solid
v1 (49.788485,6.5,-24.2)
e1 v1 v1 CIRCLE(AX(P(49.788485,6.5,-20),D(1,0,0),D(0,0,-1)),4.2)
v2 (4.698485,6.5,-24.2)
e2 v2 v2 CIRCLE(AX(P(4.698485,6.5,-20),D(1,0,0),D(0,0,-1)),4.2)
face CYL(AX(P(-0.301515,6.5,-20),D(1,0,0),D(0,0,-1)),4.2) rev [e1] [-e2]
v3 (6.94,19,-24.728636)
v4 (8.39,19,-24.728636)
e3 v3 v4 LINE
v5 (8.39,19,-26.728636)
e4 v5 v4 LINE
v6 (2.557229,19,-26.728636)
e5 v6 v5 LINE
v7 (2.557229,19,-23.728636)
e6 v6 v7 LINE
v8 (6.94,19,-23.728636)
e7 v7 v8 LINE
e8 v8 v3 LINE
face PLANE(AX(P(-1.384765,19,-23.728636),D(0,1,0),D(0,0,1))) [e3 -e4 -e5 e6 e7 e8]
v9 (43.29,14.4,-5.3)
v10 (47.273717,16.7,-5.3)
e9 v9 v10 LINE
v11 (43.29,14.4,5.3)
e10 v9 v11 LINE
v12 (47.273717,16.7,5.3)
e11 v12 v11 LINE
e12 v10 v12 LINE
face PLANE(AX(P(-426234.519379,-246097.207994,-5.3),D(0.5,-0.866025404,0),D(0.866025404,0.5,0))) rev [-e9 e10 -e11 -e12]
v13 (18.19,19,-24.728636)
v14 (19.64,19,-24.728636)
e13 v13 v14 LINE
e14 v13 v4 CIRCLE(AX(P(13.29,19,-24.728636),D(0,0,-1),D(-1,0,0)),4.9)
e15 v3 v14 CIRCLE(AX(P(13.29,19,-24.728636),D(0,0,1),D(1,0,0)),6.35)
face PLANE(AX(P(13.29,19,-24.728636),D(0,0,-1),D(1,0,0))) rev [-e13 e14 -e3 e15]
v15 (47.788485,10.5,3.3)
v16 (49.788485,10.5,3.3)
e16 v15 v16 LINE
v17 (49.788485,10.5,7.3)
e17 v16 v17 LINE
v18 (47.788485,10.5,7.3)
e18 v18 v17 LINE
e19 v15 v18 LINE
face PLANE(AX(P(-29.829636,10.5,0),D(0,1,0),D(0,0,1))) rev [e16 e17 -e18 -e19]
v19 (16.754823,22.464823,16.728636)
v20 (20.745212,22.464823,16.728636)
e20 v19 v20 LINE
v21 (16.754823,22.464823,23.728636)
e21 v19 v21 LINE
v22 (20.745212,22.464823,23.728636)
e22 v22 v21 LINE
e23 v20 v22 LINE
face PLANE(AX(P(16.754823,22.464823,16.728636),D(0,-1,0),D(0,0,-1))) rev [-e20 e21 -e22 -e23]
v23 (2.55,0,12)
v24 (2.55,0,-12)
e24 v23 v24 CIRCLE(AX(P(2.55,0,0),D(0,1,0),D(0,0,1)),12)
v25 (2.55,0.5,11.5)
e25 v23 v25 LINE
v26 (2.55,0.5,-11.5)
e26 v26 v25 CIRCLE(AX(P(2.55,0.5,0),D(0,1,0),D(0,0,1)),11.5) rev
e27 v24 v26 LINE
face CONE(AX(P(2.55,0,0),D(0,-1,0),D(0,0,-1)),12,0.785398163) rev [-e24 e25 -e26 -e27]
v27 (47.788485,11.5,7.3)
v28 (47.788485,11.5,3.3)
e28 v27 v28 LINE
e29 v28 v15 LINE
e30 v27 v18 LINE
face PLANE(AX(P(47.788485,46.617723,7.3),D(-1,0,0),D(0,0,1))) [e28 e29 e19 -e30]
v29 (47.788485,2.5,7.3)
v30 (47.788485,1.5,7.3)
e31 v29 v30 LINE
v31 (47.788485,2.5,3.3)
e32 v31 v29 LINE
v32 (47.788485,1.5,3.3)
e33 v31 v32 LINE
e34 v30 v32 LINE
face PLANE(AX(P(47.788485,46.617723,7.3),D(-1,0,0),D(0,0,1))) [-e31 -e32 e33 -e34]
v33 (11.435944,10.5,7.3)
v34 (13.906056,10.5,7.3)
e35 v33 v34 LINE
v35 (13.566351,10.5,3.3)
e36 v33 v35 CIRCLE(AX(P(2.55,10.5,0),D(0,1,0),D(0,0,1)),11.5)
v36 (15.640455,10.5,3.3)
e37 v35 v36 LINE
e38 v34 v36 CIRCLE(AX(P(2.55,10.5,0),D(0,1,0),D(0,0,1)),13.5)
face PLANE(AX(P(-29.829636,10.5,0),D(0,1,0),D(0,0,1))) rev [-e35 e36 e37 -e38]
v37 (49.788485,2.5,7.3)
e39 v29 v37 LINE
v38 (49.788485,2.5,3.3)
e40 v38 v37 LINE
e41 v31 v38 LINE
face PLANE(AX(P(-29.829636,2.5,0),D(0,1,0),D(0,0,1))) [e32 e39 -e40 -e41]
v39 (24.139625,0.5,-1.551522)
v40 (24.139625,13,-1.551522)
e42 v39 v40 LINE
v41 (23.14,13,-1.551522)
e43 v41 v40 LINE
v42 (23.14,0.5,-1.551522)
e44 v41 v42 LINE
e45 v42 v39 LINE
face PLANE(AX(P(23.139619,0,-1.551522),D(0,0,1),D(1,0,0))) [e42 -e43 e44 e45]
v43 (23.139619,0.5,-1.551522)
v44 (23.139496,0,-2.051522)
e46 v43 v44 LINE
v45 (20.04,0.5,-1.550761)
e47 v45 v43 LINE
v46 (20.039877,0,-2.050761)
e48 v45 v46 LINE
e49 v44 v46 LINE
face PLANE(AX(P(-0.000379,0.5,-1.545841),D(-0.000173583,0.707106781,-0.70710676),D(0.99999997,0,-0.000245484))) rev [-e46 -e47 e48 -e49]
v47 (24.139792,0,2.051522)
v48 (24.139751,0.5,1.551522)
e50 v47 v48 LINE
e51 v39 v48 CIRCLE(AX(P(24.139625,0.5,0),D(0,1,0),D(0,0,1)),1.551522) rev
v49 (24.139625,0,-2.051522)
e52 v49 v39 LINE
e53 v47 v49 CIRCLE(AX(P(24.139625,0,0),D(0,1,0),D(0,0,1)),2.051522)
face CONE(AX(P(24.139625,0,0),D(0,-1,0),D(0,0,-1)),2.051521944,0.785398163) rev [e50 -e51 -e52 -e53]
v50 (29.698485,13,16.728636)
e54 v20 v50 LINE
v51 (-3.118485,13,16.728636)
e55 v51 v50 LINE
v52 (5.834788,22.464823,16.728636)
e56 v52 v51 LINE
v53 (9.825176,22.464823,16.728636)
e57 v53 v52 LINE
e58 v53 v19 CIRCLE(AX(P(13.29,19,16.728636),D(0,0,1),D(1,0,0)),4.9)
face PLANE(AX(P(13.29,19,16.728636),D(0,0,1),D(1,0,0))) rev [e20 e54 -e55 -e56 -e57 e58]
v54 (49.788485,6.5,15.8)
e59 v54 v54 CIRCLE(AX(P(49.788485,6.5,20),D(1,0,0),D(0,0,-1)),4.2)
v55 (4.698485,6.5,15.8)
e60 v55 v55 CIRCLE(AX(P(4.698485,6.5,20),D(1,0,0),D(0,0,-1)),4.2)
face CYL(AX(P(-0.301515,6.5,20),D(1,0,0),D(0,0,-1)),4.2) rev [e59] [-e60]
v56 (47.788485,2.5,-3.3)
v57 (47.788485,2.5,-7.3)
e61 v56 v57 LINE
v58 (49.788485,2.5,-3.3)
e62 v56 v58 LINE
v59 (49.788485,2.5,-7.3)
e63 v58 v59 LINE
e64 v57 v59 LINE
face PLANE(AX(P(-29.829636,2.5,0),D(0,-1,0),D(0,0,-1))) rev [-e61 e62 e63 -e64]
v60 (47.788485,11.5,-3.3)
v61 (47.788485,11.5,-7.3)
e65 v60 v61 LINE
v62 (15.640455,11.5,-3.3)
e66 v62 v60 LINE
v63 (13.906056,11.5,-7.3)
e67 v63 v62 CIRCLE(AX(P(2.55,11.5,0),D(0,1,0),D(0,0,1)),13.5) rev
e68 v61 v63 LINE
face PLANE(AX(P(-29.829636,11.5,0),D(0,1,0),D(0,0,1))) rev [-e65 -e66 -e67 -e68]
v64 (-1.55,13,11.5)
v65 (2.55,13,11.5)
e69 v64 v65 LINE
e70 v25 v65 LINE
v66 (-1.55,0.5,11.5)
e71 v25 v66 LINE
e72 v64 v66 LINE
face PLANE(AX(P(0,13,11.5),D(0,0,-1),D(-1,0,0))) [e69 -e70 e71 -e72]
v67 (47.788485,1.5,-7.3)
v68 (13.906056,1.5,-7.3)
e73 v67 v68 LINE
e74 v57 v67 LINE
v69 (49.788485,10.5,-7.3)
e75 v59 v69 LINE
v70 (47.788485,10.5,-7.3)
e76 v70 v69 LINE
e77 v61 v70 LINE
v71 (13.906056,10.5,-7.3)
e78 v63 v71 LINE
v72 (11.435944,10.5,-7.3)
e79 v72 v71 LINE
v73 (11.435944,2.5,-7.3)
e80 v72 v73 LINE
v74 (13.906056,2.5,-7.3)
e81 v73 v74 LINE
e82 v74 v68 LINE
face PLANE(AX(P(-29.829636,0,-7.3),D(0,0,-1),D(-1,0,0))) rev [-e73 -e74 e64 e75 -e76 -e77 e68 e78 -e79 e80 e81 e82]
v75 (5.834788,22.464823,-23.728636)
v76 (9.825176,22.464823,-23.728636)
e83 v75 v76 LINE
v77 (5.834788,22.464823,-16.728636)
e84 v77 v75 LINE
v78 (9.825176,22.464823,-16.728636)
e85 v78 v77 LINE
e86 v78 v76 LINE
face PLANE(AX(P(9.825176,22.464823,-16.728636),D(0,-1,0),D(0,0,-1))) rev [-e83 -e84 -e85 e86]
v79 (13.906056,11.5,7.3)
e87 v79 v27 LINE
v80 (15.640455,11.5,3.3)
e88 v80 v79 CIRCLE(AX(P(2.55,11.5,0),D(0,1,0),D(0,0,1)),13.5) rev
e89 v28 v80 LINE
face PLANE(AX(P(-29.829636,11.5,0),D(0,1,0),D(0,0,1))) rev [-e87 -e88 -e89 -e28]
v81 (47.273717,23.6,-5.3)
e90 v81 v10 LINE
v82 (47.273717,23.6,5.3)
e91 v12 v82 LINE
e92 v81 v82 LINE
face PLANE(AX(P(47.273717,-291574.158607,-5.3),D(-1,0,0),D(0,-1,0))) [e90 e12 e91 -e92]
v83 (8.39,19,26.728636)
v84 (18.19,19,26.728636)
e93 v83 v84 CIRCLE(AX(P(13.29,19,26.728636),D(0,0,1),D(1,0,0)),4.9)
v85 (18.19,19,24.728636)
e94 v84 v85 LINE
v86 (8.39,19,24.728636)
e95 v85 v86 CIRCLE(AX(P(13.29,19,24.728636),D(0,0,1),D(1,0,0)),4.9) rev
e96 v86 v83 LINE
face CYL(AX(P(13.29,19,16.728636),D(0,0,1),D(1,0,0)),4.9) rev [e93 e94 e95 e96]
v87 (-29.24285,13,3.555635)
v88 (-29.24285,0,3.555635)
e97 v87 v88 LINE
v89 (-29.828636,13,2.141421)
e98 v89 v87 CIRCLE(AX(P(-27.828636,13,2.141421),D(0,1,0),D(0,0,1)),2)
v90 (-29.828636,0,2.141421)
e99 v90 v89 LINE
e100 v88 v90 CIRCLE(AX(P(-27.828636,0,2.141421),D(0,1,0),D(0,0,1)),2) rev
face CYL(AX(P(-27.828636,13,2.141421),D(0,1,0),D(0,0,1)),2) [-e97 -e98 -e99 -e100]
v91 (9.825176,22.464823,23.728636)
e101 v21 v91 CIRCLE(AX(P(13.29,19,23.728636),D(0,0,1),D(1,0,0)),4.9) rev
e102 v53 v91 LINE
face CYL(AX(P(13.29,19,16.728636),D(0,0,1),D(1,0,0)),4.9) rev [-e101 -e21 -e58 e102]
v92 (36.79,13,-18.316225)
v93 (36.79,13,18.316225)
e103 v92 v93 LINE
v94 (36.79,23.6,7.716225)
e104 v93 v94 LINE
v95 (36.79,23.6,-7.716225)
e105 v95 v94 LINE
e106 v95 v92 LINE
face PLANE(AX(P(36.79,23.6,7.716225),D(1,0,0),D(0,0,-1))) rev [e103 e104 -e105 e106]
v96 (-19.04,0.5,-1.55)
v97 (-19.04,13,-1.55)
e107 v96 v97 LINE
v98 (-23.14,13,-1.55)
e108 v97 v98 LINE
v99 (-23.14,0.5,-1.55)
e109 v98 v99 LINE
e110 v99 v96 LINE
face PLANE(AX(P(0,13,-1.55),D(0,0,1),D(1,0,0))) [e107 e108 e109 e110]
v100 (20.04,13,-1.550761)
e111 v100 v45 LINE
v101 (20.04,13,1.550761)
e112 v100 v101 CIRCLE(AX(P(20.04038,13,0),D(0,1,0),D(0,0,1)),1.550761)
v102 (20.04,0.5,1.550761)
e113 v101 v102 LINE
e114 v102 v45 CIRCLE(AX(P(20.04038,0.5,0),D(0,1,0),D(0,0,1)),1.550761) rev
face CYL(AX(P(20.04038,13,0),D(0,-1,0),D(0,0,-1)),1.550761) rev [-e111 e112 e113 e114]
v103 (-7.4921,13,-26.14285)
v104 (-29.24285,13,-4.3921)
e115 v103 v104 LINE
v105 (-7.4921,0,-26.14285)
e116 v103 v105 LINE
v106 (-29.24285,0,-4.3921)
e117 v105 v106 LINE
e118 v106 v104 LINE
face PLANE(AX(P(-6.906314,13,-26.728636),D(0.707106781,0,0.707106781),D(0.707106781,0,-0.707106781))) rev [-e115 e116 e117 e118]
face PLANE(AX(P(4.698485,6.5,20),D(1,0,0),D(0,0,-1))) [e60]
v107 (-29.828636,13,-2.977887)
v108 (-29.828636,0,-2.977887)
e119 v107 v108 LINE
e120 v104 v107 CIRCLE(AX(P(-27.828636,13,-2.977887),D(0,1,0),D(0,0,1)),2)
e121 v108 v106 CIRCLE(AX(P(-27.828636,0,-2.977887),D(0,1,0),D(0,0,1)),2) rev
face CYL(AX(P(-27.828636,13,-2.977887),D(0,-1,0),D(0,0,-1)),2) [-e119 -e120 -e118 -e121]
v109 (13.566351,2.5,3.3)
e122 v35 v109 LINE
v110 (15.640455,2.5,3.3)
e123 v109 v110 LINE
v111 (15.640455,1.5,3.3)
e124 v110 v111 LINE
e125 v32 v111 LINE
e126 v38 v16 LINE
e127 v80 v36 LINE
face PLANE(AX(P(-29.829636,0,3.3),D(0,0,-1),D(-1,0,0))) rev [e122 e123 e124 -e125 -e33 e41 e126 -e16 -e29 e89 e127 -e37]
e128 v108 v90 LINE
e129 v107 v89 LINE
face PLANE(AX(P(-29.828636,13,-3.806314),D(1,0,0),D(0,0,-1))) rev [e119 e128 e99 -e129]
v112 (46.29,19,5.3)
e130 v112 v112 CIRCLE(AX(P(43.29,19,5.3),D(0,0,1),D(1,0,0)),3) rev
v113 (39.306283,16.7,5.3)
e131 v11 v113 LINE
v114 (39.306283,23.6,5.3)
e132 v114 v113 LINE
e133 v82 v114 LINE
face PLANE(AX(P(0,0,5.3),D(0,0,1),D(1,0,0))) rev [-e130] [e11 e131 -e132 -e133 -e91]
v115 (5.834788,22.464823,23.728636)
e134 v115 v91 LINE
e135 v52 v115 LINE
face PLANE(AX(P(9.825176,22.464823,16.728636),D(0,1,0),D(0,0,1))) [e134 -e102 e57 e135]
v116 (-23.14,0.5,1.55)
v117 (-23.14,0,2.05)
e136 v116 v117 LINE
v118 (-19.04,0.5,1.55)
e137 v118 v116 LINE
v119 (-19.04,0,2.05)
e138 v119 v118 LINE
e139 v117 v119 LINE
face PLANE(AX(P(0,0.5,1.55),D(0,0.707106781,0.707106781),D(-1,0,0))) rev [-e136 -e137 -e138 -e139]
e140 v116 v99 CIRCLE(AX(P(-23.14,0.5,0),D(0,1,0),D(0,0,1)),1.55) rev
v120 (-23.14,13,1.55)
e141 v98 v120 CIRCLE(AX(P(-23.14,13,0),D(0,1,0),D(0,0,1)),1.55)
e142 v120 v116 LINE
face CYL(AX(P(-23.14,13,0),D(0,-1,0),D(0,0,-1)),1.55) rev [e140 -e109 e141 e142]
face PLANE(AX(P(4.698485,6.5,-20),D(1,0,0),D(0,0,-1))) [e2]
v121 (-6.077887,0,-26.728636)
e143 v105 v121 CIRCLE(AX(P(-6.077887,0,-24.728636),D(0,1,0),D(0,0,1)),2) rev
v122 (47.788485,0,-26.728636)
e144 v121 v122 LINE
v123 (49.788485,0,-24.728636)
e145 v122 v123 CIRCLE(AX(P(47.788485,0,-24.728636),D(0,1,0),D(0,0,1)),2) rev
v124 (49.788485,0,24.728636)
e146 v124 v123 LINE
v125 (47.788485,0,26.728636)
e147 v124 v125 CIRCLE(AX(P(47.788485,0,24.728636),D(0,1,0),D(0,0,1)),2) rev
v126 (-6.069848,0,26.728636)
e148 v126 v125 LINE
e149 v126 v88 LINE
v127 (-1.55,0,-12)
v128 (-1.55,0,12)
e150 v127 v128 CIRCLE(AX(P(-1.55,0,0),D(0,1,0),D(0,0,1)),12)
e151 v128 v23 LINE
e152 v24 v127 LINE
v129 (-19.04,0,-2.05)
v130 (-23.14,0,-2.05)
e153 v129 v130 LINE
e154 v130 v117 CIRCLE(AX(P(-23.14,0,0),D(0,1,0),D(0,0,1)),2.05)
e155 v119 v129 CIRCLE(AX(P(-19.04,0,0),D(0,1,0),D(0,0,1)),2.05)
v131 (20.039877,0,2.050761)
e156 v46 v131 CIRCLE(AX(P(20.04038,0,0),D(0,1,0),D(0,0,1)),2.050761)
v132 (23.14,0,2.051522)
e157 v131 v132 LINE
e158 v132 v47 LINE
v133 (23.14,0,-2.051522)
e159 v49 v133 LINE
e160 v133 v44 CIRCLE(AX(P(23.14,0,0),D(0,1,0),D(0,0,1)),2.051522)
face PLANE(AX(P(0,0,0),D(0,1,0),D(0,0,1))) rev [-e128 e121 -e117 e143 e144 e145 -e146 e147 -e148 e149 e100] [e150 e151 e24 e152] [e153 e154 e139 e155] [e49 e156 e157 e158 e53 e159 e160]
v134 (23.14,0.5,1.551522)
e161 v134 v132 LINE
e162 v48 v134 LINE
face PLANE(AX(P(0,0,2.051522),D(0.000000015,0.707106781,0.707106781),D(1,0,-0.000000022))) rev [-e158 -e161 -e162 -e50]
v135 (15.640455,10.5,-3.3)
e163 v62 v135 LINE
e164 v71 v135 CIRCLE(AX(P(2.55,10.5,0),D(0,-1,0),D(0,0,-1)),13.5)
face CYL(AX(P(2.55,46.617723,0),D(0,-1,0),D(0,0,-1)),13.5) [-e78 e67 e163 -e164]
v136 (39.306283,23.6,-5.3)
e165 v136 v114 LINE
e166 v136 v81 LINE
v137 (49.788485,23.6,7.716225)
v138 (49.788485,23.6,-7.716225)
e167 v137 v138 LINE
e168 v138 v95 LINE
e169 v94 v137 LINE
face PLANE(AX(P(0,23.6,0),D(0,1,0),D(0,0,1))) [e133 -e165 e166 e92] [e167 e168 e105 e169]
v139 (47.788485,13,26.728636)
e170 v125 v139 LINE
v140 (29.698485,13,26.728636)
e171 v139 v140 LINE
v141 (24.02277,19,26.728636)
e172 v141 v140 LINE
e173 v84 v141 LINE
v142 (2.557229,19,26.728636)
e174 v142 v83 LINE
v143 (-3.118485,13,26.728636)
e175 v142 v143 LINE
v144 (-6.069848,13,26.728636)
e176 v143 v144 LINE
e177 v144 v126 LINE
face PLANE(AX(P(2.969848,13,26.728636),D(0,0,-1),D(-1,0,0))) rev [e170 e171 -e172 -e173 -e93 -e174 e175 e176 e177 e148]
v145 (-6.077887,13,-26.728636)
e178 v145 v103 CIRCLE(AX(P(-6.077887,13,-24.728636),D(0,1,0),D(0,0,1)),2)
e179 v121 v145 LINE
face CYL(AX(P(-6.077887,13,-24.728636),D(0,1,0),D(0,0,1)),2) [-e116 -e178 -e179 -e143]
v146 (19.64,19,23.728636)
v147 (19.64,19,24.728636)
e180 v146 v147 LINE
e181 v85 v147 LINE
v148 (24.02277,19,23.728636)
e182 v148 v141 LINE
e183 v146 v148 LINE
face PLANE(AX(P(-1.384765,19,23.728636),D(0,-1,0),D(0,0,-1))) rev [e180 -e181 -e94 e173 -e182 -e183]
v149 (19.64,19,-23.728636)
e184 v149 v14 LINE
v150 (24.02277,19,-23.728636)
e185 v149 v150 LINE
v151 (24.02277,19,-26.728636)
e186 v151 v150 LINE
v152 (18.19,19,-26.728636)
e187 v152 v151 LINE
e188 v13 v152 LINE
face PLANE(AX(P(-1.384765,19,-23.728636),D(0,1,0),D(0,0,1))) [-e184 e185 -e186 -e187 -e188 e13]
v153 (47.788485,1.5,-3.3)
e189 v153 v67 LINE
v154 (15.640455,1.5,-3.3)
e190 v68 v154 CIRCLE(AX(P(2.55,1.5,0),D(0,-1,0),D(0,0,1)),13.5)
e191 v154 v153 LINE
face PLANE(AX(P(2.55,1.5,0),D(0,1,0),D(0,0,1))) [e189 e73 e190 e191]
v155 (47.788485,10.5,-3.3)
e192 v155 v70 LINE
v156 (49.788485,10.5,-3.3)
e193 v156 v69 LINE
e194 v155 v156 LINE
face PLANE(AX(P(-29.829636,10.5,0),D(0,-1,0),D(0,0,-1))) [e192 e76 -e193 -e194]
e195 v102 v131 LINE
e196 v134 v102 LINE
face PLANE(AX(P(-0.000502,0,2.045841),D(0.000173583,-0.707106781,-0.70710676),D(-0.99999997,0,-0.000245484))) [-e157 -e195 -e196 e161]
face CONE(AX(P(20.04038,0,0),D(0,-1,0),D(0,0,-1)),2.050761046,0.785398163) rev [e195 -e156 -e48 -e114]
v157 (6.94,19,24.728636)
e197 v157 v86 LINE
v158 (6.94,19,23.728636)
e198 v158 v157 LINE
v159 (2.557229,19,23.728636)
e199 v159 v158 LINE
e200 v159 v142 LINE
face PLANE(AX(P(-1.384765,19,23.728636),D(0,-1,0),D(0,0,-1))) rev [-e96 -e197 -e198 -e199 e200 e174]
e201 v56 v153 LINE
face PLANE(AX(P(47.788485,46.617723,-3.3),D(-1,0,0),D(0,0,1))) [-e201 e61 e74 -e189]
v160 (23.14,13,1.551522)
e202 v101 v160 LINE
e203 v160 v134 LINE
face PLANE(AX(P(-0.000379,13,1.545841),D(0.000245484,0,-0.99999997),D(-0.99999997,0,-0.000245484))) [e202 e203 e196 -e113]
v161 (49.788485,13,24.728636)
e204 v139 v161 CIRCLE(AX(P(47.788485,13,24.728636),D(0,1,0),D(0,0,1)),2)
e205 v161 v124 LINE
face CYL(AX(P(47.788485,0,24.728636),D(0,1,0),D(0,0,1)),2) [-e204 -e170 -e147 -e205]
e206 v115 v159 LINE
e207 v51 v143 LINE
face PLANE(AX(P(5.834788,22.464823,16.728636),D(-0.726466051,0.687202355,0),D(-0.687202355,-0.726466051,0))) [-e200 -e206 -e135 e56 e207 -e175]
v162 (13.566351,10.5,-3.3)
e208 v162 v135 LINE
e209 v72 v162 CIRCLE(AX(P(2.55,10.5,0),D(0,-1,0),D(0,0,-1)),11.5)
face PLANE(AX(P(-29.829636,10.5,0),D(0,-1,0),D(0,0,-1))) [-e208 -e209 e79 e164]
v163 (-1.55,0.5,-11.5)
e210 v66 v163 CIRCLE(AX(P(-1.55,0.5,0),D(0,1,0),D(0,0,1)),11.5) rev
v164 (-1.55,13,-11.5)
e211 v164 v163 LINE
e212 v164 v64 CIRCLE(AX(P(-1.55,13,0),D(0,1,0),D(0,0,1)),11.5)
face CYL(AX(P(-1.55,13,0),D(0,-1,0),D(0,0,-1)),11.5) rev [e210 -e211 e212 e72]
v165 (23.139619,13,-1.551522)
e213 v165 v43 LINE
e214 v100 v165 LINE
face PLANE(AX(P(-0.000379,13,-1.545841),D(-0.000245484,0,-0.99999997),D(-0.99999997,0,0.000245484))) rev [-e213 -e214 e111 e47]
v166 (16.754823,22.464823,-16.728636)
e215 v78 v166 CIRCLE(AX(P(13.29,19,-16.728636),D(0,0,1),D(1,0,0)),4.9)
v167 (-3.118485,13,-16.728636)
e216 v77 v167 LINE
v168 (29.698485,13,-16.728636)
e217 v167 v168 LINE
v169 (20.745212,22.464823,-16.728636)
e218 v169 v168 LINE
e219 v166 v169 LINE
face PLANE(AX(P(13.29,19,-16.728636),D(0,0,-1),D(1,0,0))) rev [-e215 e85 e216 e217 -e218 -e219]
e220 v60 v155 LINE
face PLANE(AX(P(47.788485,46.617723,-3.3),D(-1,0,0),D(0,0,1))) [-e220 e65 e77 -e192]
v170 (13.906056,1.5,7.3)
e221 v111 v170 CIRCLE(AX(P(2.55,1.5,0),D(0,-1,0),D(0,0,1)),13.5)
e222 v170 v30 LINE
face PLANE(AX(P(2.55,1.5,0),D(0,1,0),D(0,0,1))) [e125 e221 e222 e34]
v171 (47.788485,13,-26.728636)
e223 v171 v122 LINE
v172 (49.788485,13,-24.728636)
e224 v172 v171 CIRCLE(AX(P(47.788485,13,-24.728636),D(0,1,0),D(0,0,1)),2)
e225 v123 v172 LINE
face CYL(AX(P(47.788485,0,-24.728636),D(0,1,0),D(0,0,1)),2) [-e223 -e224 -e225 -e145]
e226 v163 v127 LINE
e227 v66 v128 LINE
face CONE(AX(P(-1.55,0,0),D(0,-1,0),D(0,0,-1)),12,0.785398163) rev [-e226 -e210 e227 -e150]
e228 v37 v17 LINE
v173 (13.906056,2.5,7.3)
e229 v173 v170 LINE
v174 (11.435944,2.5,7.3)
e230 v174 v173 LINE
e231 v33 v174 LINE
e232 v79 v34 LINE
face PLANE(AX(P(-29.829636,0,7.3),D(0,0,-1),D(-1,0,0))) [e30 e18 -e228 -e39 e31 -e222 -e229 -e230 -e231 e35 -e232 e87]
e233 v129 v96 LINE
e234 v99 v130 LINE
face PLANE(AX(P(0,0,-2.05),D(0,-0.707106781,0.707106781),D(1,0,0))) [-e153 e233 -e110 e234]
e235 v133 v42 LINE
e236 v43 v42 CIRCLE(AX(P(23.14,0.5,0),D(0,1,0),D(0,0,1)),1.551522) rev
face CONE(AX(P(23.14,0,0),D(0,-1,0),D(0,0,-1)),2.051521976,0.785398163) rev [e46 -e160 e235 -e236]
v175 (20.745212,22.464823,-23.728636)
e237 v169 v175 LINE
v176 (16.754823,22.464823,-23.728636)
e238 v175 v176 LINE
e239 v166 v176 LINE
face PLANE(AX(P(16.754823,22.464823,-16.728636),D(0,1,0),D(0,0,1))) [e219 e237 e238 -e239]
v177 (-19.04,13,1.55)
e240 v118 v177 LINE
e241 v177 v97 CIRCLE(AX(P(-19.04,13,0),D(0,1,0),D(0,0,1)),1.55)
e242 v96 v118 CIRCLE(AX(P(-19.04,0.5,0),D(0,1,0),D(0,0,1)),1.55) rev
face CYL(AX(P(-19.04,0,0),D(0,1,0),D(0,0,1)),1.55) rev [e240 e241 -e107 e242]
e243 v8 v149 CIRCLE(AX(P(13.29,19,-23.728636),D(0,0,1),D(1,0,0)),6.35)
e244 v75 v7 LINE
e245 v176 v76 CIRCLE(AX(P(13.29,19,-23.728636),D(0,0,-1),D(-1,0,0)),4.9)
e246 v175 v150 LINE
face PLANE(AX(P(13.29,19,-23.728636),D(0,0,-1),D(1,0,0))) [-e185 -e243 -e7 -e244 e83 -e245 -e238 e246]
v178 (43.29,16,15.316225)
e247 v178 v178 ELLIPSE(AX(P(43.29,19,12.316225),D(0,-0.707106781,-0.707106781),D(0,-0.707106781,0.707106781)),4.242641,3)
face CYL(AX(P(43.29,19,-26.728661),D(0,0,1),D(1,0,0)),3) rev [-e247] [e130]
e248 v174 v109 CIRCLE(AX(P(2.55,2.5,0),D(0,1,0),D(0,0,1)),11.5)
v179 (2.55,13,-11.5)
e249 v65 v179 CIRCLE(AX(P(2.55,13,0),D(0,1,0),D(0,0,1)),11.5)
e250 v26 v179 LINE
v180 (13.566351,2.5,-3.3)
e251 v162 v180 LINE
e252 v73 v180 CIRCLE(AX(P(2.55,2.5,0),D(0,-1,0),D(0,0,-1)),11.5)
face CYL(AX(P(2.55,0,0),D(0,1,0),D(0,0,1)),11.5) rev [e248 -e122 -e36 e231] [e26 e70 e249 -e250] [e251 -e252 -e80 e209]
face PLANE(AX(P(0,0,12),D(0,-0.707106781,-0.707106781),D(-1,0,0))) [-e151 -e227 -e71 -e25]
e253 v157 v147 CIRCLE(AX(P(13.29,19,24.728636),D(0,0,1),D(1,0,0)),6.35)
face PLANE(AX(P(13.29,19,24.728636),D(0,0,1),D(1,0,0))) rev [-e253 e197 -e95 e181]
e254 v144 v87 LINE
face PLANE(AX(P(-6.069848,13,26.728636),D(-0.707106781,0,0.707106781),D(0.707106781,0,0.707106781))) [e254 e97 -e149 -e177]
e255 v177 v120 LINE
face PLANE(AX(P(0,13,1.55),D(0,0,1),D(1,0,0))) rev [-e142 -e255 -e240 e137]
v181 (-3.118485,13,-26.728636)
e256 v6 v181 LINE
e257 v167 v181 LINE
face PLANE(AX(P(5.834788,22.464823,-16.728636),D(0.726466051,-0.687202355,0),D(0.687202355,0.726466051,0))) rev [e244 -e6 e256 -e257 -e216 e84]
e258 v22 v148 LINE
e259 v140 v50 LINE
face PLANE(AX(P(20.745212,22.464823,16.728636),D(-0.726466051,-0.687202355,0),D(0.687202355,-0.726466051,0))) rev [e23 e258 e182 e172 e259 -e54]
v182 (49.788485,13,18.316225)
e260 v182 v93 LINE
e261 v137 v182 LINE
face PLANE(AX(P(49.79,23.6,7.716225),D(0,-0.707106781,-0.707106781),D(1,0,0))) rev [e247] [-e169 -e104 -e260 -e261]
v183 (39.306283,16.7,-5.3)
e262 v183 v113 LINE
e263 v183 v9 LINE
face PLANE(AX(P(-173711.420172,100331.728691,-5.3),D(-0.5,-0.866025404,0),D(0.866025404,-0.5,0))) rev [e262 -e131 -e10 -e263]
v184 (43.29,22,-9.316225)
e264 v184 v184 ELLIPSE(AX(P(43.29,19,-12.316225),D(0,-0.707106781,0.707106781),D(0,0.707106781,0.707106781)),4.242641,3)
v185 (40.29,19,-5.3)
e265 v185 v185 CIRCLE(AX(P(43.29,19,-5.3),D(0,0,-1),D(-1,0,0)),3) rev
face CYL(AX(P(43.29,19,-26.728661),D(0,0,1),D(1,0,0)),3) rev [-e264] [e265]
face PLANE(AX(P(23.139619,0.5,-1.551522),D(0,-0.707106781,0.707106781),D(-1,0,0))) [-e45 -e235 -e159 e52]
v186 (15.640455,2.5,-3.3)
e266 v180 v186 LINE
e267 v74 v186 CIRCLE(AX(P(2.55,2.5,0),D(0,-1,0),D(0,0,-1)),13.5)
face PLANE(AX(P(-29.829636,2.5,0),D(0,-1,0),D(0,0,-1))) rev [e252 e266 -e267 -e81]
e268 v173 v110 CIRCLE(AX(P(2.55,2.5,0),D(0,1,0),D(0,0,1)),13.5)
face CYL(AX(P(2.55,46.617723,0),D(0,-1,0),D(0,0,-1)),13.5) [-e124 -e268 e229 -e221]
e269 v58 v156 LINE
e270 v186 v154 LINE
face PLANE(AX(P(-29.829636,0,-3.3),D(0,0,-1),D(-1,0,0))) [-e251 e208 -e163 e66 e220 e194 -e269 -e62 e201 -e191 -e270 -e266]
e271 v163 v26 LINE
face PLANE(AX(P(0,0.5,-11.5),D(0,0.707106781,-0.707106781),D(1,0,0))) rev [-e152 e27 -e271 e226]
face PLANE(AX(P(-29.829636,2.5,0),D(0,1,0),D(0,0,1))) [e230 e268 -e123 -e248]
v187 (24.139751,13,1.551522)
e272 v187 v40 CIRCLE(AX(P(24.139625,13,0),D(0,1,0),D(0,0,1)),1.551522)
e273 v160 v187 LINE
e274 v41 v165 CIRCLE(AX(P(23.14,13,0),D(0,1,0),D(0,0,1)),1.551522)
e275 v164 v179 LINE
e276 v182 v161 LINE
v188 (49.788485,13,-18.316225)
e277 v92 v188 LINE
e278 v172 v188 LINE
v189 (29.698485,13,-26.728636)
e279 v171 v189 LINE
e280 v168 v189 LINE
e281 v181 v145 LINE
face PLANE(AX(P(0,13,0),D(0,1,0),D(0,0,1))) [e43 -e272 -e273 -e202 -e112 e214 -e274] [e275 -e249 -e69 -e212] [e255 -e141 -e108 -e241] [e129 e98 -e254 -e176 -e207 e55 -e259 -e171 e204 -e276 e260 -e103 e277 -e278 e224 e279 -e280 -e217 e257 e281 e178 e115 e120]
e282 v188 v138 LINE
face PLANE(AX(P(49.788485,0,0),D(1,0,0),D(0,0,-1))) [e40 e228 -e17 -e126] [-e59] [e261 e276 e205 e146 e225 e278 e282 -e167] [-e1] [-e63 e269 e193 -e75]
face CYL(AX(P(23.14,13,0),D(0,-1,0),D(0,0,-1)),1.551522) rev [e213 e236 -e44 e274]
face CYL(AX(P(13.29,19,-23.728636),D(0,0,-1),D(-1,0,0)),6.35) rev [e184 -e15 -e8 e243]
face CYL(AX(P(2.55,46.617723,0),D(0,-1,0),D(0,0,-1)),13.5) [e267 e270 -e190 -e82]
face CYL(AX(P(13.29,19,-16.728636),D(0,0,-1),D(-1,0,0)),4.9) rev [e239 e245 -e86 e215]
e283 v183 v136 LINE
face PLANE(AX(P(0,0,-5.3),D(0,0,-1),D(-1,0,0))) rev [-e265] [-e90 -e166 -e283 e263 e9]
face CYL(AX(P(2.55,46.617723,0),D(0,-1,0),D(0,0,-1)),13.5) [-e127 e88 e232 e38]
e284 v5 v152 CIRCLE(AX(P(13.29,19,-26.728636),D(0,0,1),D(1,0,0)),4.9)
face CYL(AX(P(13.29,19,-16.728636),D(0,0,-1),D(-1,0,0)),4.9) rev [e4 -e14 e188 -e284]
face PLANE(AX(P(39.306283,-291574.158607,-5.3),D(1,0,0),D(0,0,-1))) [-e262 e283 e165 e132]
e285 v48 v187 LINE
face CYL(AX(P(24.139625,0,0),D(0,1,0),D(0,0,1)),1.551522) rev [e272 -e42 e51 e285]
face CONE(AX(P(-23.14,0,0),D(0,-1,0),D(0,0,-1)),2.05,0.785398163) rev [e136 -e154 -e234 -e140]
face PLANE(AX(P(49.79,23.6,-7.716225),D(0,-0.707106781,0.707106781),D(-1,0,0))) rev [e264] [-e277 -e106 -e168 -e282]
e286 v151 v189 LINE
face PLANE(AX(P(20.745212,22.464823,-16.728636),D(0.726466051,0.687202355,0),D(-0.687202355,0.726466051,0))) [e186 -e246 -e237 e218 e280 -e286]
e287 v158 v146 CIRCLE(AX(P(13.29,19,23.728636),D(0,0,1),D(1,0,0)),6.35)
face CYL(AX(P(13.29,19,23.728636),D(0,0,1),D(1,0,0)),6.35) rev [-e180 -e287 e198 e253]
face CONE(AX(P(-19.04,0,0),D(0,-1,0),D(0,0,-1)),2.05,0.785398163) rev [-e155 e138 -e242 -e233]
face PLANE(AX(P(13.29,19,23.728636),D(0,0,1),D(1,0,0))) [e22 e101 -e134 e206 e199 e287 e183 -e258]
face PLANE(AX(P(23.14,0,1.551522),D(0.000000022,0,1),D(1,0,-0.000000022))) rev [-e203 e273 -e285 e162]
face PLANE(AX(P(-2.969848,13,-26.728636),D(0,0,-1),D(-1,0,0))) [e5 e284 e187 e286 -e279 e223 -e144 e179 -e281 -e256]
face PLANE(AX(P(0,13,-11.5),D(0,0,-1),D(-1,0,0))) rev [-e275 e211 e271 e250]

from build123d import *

# Parameters (mm, degrees)
BOSS_EXTRUDE2_DEPTH      = 13
CUT_EXTRUDE6_DEPTH       = 43.108996013
CUT_EXTRUDE7_DEPTH       = 43.108996013
CUT_EXTRUDE8_DEPTH       = 13
SKETCH7_R                = 4.2
CUT_EXTRUDE9_DEPTH       = 30
BOSS_EXTRUDE3_DEPTH      = 10
CUT_EXTRUDE10_DEPTH      = 1
SKETCH13_R               = 4.2
BOSS_EXTRUDE4_DEPTH      = 20.09
SKETCH17_W               = 13
SKETCH17_H               = 15.432451
BOSS_EXTRUDE5_DEPTH      = 10.6
CHAMFER1_SIZE            = 10.6
SKETCH12_R               = 3
CUT_EXTRUDE11_DEPTH      = 77.770333281
CUT_EXTRUDE12_START      = -6.148636
CUT_EXTRUDE12_DEPTH      = 5.3
FILLET2_R                = 2
SKETCH25_W               = 86.308607618
SKETCH25_H               = 69.103285455
CUT_EXTRUDE13_DEPTH      = 0.00151491
CUT_EXTRUDE14_DEPTH      = 58.985456967
CUT_EXTRUDE15_REACH      = 89.237
CUT_EXTRUDE15_END_RADIUS = 11.5
SKETCH27_W               = 4
SKETCH27_H               = 8
SKETCH28_W               = 26.149590075
SKETCH28_H               = 8.463351347
CUT_EXTRUDE16_DEPTH      = 3
FILLET9_R                = 2
SKETCH34_R               = 4.2
BOSS_EXTRUDE7_DEPTH      = 5
CUT_EXTRUDE22_START      = -13
CUT_EXTRUDE22_DEPTH      = 13
CUT_EXTRUDE23_DEPTH      = 58.985456967
CUT_EXTRUDE24_START      = -1
CUT_EXTRUDE24_DEPTH      = 10
CHAMFER2_SIZE            = 0.5


# Read off the part's stored shape, not the designer's step: Cut-Extrude22
with BuildPart() as part:
    # Sketch1 → Boss-Extrude2 (new body)
    with BuildSketch(Plane(origin=(0, 0, 0), x_dir=(1, 0, 0), z_dir=(0, 1, 0))):
        Polygon((-2.969848481, 26.728636329), (-6.906313813, 26.728636329), (-29.828636329, 3.806313813), (-29.828636329, -2.969848481), (-6.069848481, -26.728636329), (-2.969848481, -26.728636329), (2.969848481, -26.728636329), (29.69848481, -26.728636329), (29.69848481, 26.728636329), (2.969848481, 26.728636329), align=None)
    extrude(amount=BOSS_EXTRUDE2_DEPTH)

    # Sketch1<8> → Cut-Extrude6 (cut, through all)
    with BuildSketch(Plane(origin=(0, 0, 0), x_dir=(1, 0, 0), z_dir=(0, 1, 0))):
        with BuildLine():
            Line((-23.14, -1.55), (-20.04, -1.55))
            ThreePointArc((-20.04, -1.55), (-18.49, 0), (-20.04, 1.55))
            Line((-20.04, 1.55), (-23.14, 1.55))
            ThreePointArc((-23.14, 1.55), (-24.69, 0), (-23.14, -1.55))
        make_face()
    extrude(amount=CUT_EXTRUDE6_DEPTH, mode=Mode.SUBTRACT)

    # Sketch1<9> → Cut-Extrude7 (cut, through all)
    with BuildSketch(Plane(origin=(0, 0, 0), x_dir=(1, 0, 0), z_dir=(0, 1, 0))):
        with BuildLine():
            Line((9.28999972, -8.505433812), (9.28999972, 8.505433812))
            ThreePointArc((9.28999972, 8.505433812), (5.69954884, 10.725261974), (1.55, 11.5))
            Line((1.55, 11.5), (-1.55, 11.5))
            ThreePointArc((-1.55, 11.5), (-13.05, 0), (-1.55, -11.5))
            Line((-1.55, -11.5), (1.55, -11.5))
            ThreePointArc((1.55, -11.5), (5.69954884, -10.725261974), (9.28999972, -8.505433812))
        make_face()
        with BuildLine():
            ThreePointArc((9.28999972, -8.505433812), (13.05, 0), (9.28999972, 8.505433812))
            Line((9.28999972, 8.505433812), (9.28999972, -8.505433812))
        make_face()
    extrude(amount=CUT_EXTRUDE7_DEPTH, mode=Mode.SUBTRACT)

    # Sketch1<11> → Cut-Extrude8 (cut)
    with BuildSketch(Plane(origin=(0, 0, 0), x_dir=(1, 0, 0), z_dir=(0, 1, 0))):
        with BuildLine():
            Line((23.139619127, 1.551521906), (20.03999972, 1.550761))
            ThreePointArc((20.03999972, 1.550761), (18.48961936, 0), (20.03999972, -1.550761))
            Line((20.03999972, -1.550761), (23.14, -1.551521999))
            ThreePointArc((23.14, -1.551521999), (24.691521964, 0.000190413), (23.139619127, 1.551521906))
        make_face()
        with BuildLine():
            ThreePointArc((21.589619103, -0.059493857), (21.588478024, -1.2e-08), (21.589619104, 0.059493833))
            ThreePointArc((21.589619104, 0.059493833), (21.590760744, -1.2e-08), (21.589619103, -0.059493857))
        make_face(mode=Mode.SUBTRACT)
    extrude(amount=CUT_EXTRUDE8_DEPTH, mode=Mode.SUBTRACT)


with BuildPart() as cut_extrude8_piece_1:
    # of the separate pieces the step leaves, piece 1, a body of its own (cut_extrude8_pieces)
    add(part.part.solids().sort_by_distance((-6.906313813, 0, -26.728636329))[0])

    # Sketch7 → Cut-Extrude9 (cut)
    with BuildSketch(Plane(origin=(29.69848481, 0, 0), x_dir=(0, 0, -1), z_dir=(1, 0, 0))):
        with Locations((-20, 6.5)):
            Circle(SKETCH7_R)
        with Locations((20, 6.5)):
            Circle(SKETCH7_R)
    extrude(amount=-CUT_EXTRUDE9_DEPTH, mode=Mode.SUBTRACT)

    # Sketch9 → Boss-Extrude3 (add)
    with BuildSketch(Plane.XY.offset(26.728636329)):
        with BuildLine():
            Line((-3.11848537, 13), (29.69848481, 13))
            Line((29.69848481, 13), (20.745211893, 22.464823228))
            Line((20.745211893, 22.464823228), (16.754822948, 22.464823228))
            ThreePointArc((16.754822948, 22.464823228), (13.28999972, 14.1), (9.825176492, 22.464823228))
            Line((9.825176492, 22.464823228), (5.834787547, 22.464823228))
            Line((5.834787547, 22.464823228), (-3.11848537, 13))
        make_face()
    boss_extrude3 = extrude(amount=-BOSS_EXTRUDE3_DEPTH)

    # Sketch10 → Cut-Extrude10 (cut)
    with BuildSketch(Plane.XY.offset(24.728636329)):
        with BuildLine():
            Line((6.93999972, 19), (6.93999972, 29.430631577))
            Line((6.93999972, 29.430631577), (19.63999972, 29.430631577))
            Line((19.63999972, 29.430631577), (19.63999972, 19))
            ThreePointArc((19.63999972, 19), (13.28999972, 12.65), (6.93999972, 19))
        make_face()
    cut_extrude10 = extrude(amount=-CUT_EXTRUDE10_DEPTH, mode=Mode.SUBTRACT)

    # Mirror1: Boss-Extrude3, Cut-Extrude10 across plane
    add(boss_extrude3.mirror(Plane.XY))
    add(cut_extrude10.mirror(Plane.XY), mode=Mode.SUBTRACT)

    # Sketch13 → Boss-Extrude4 (add)
    with BuildSketch(Plane(origin=(29.69848481, 0, 0), x_dir=(0, 0, -1), z_dir=(1, 0, 0))):
        Polygon((-26.728636329, 0), (26.728636329, 0), (26.728636329, 13), (16.728636329, 13), (-16.728636329, 13), (-26.728636329, 13), align=None)
        with Locations((-20, 6.5)):
            Circle(SKETCH13_R, mode=Mode.SUBTRACT)
        with Locations((20, 6.5)):
            Circle(SKETCH13_R, mode=Mode.SUBTRACT)
    extrude(amount=BOSS_EXTRUDE4_DEPTH)

    # Sketch17 → Boss-Extrude5 (add)
    with BuildSketch(Plane(origin=(0, 13, 0), x_dir=(1, 0, 0), z_dir=(0, 1, 0))):
        with Locations((43.28999972, 0)):
            Rectangle(SKETCH17_W, SKETCH17_H)
    extrude(amount=BOSS_EXTRUDE5_DEPTH)

    # Chamfer1
    # the kernel refuses this chamfer: 10.6 mm, written as the material it adds along each edge
    with BuildSketch(Plane(origin=(49.78848481, 13, 7.7162255), x_dir=(0, -0.027495876610586376, 0.9996219169112966), z_dir=(-1, 0, 0)), Plane(origin=(36.78999972, 13, -7.7162255), x_dir=(0, -0.02749587661058638, -0.9996219169112966), z_dir=(1, 0, 0))) as chamfer1_piece_1:
        Polygon((CHAMFER1_SIZE * 0.999621916911, CHAMFER1_SIZE * 0.0274958766106), (-CHAMFER1_SIZE * 0.0274958766106, CHAMFER1_SIZE * 0.999621916911), (0, 0), align=None)
    extrude(amount=12.99848509)

    # Sketch12 → Cut-Extrude11 (cut, through all)
    with BuildSketch(Plane.XY.offset(26.728636329)):
        with Locations(Location((43.28999972, 19, 0), (0, 0, 270))):
            Circle(SKETCH12_R)
    extrude(amount=-CUT_EXTRUDE11_DEPTH, mode=Mode.SUBTRACT)

    # Sketch24 → Cut-Extrude12 (cut)
    with BuildSketch(Plane.XY.offset(6.148636329).offset(CUT_EXTRUDE12_START)):
        Polygon((47.273716577, 23.6), (47.273716577, 21.3), (47.273716577, 16.7), (43.28999972, 14.4), (39.306282862, 16.7), (39.306282862, 21.3), (39.306282862, 23.6), align=None)
    cut_extrude12 = extrude(amount=-CUT_EXTRUDE12_DEPTH, mode=Mode.SUBTRACT)

    # Fillet2
    fillet2_edges = [cut_extrude8_piece_1.edges().sort_by_distance(p)[0] for p in [
        (49.78848481, 6.5, 26.728636329),
        (49.78848481, 6.5, -26.728636329),
    ]]
    fillet(fillet2_edges, radius=FILLET2_R)

    # Sketch25 → Cut-Extrude13 (cut)
    with BuildSketch(Plane(origin=(49.78999972, 0, 0), x_dir=(0, 0, -1), z_dir=(1, 0, 0))):
        with Locations((0, 8.901936044)):
            Rectangle(SKETCH25_W, SKETCH25_H)
    extrude(amount=-CUT_EXTRUDE13_DEPTH, mode=Mode.SUBTRACT)

    # Cut-Extrude15: up to this cylinder (the profile starts outside it)
    cut_extrude15_end = Plane(origin=(1.55, 6.5, 0), z_dir=(0, -1, 0)) * Cylinder(CUT_EXTRUDE15_END_RADIUS, 202.474, mode=Mode.PRIVATE)
    # Sketch27 → Cut-Extrude15 (cut, up to the surface)
    with BuildSketch(Plane(origin=(49.78848481, 0, 0), x_dir=(0, 0, -1), z_dir=(1, 0, 0)), mode=Mode.PRIVATE) as cut_extrude15_sk1:
        with Locations((-5.3, 6.5)):
            Rectangle(SKETCH27_W, SKETCH27_H)
    cut_extrude15_tool1 = extrude(cut_extrude15_sk1.sketch, amount=-CUT_EXTRUDE15_REACH, mode=Mode.PRIVATE) - cut_extrude15_end
    cut_extrude15 = cut_extrude15_tool1.solids().sort_by_distance((49.788485, 6.5, 5.3))[0]
    add(cut_extrude15, mode=Mode.SUBTRACT)

    # Mirror2: Cut-Extrude15 across plane
    add(cut_extrude15.mirror(Plane.XY), mode=Mode.SUBTRACT)

    # Mirror3: Cut-Extrude12 across plane
    add(cut_extrude12.mirror(Plane.XY), mode=Mode.SUBTRACT)

    # Sketch28 → Cut-Extrude16 (cut)
    with BuildSketch(Plane.XY.offset(26.728636329)):
        with Locations((11.690030011, 23.231675673)):
            Rectangle(SKETCH28_W, SKETCH28_H)
    cut_extrude16 = extrude(amount=-CUT_EXTRUDE16_DEPTH, mode=Mode.SUBTRACT)

    # Mirror4: Cut-Extrude16 across plane
    add(cut_extrude16.mirror(Plane.XY), mode=Mode.SUBTRACT)

    # Fillet9
    fillet9_edges = [cut_extrude8_piece_1.edges().sort_by_distance(p)[0] for p in [
        (-6.906313813, 6.5, -26.728636329),
        (-29.828636329, 6.5, -3.806313813),
        (-29.828636329, 6.5, 2.969848481),
    ]]
    fillet(fillet9_edges, radius=FILLET9_R)

    # Sketch34 → Boss-Extrude7 (add)
    with BuildSketch(Plane(origin=(-0.30151519, 0, 0), x_dir=(0, 0, -1), z_dir=(1, 0, 0))):
        with Locations((-20, 6.5)):
            Circle(SKETCH34_R)
        with Locations((20, 6.5)):
            Circle(SKETCH34_R)
    extrude(amount=BOSS_EXTRUDE7_DEPTH)

    # Cut-Extrude22 outline → Cut-Extrude22 (cut)
    with BuildSketch(Plane(origin=(0, 13, 0), x_dir=(1, 0, 0), z_dir=(0, 1, 0)).offset(CUT_EXTRUDE22_START)):
        with BuildLine():
            ThreePointArc((-20.04, 1.55), (-18.49, 0), (-20.04, -1.55))
            Line((-20.04, -1.55), (-19.04, -1.55))
            ThreePointArc((-19.04, -1.55), (-17.49, 0), (-19.04, 1.55))
            Line((-19.04, 1.55), (-20.04, 1.55))
        make_face()
        with BuildLine():
            Line((24.139625451, 1.551521906), (23.14, 1.551521953))
            ThreePointArc((23.14, 1.551521953), (24.691521976, -2.3e-08), (23.14, -1.551521999))
            Line((23.14, -1.551521999), (24.139751204, -1.551521977))
            ThreePointArc((24.139751204, -1.551521977), (25.691147394, 6.2838e-05), (24.139625451, 1.551521906))
        make_face()
    extrude(amount=CUT_EXTRUDE22_DEPTH, mode=Mode.SUBTRACT)

    # Sketch38 → Cut-Extrude23 (cut, through all)
    with BuildSketch(Plane(origin=(0, 13, 0), x_dir=(1, 0, 0), z_dir=(0, 1, 0))):
        with BuildLine():
            ThreePointArc((1.55, 11.5), (13.05, 0), (1.55, -11.5))
            Line((1.55, -11.5), (2.55, -11.5))
            ThreePointArc((2.55, -11.5), (14.05, 0), (2.55, 11.5))
            Line((2.55, 11.5), (1.55, 11.5))
        make_face()
    extrude(amount=-CUT_EXTRUDE23_DEPTH, mode=Mode.SUBTRACT)

    # Sketch39 → Cut-Extrude24 (cut)
    with BuildSketch(Plane(origin=(0, 2.5, 0), x_dir=(1, 0, 0), z_dir=(0, 1, 0)).offset(CUT_EXTRUDE24_START)):
        with BuildLine():
            Line((47.78848481, 7.3), (13.906055653, 7.3))
            ThreePointArc((13.906055653, 7.3), (14.935796911, 5.370478086), (15.640454538, 3.3))
            Line((15.640454538, 3.3), (47.78848481, 3.3))
            Line((47.78848481, 3.3), (47.78848481, 7.3))
        make_face()
        with BuildLine():
            Line((13.906055653, -7.3), (47.78848481, -7.3))
            Line((47.78848481, -7.3), (47.78848481, -3.3))
            Line((47.78848481, -3.3), (15.640454538, -3.3))
            ThreePointArc((15.640454538, -3.3), (14.935796911, -5.370478086), (13.906055653, -7.3))
        make_face()
    extrude(amount=CUT_EXTRUDE24_DEPTH, mode=Mode.SUBTRACT)

    # Chamfer2
    chamfer2_edges = [cut_extrude8_piece_1.edges().sort_by_distance(p)[0] for p in [
        (0.5, 0, 11.5),
        (-13.05, 0, 0),
        (-24.69, 0, 0),
        (-21.09, 0, -1.55),
        (21.58999986, 0, 1.551141499),
        (18.48961936, 0, 0),
        (-17.49, 0, 0),
        (23.139809563, 0, -1.551521941),
        (25.691147394, 0, -6.2838e-05),
        (23.639875602, 0, 1.551521988),
        (23.639812726, 0, -1.55152193),
        (14.05, 0, 0),
        (-21.09, 0, 1.55),
        (0.5, 0, -11.5),
        (21.589809423, 0, -1.551141453),
    ]]
    chamfer(chamfer2_edges, length=CHAMFER2_SIZE)


with BuildPart() as cut_extrude8_piece_2:
    # of the separate pieces the step leaves, piece 2, a body of its own (cut_extrude8_pieces)
    add(part.part.solids().sort_by_distance((21.589619104, 0, -0.059493833))[0])

    # Sketch26 → Cut-Extrude14 (cut, through all)
    with BuildSketch(Plane(origin=(0, 13, 0), x_dir=(1, 0, 0), z_dir=(0, 1, 0))):
        with BuildLine():
            ThreePointArc((21.589619104, 0.059493833), (21.588478024, -1.2e-08), (21.589619103, -0.059493857))
            ThreePointArc((21.589619103, -0.059493857), (21.590760744, -1.2e-08), (21.589619104, 0.059493833))
        make_face()
    extrude(amount=-CUT_EXTRUDE14_DEPTH, mode=Mode.SUBTRACT)


solid = cut_extrude8_piece_1.part
